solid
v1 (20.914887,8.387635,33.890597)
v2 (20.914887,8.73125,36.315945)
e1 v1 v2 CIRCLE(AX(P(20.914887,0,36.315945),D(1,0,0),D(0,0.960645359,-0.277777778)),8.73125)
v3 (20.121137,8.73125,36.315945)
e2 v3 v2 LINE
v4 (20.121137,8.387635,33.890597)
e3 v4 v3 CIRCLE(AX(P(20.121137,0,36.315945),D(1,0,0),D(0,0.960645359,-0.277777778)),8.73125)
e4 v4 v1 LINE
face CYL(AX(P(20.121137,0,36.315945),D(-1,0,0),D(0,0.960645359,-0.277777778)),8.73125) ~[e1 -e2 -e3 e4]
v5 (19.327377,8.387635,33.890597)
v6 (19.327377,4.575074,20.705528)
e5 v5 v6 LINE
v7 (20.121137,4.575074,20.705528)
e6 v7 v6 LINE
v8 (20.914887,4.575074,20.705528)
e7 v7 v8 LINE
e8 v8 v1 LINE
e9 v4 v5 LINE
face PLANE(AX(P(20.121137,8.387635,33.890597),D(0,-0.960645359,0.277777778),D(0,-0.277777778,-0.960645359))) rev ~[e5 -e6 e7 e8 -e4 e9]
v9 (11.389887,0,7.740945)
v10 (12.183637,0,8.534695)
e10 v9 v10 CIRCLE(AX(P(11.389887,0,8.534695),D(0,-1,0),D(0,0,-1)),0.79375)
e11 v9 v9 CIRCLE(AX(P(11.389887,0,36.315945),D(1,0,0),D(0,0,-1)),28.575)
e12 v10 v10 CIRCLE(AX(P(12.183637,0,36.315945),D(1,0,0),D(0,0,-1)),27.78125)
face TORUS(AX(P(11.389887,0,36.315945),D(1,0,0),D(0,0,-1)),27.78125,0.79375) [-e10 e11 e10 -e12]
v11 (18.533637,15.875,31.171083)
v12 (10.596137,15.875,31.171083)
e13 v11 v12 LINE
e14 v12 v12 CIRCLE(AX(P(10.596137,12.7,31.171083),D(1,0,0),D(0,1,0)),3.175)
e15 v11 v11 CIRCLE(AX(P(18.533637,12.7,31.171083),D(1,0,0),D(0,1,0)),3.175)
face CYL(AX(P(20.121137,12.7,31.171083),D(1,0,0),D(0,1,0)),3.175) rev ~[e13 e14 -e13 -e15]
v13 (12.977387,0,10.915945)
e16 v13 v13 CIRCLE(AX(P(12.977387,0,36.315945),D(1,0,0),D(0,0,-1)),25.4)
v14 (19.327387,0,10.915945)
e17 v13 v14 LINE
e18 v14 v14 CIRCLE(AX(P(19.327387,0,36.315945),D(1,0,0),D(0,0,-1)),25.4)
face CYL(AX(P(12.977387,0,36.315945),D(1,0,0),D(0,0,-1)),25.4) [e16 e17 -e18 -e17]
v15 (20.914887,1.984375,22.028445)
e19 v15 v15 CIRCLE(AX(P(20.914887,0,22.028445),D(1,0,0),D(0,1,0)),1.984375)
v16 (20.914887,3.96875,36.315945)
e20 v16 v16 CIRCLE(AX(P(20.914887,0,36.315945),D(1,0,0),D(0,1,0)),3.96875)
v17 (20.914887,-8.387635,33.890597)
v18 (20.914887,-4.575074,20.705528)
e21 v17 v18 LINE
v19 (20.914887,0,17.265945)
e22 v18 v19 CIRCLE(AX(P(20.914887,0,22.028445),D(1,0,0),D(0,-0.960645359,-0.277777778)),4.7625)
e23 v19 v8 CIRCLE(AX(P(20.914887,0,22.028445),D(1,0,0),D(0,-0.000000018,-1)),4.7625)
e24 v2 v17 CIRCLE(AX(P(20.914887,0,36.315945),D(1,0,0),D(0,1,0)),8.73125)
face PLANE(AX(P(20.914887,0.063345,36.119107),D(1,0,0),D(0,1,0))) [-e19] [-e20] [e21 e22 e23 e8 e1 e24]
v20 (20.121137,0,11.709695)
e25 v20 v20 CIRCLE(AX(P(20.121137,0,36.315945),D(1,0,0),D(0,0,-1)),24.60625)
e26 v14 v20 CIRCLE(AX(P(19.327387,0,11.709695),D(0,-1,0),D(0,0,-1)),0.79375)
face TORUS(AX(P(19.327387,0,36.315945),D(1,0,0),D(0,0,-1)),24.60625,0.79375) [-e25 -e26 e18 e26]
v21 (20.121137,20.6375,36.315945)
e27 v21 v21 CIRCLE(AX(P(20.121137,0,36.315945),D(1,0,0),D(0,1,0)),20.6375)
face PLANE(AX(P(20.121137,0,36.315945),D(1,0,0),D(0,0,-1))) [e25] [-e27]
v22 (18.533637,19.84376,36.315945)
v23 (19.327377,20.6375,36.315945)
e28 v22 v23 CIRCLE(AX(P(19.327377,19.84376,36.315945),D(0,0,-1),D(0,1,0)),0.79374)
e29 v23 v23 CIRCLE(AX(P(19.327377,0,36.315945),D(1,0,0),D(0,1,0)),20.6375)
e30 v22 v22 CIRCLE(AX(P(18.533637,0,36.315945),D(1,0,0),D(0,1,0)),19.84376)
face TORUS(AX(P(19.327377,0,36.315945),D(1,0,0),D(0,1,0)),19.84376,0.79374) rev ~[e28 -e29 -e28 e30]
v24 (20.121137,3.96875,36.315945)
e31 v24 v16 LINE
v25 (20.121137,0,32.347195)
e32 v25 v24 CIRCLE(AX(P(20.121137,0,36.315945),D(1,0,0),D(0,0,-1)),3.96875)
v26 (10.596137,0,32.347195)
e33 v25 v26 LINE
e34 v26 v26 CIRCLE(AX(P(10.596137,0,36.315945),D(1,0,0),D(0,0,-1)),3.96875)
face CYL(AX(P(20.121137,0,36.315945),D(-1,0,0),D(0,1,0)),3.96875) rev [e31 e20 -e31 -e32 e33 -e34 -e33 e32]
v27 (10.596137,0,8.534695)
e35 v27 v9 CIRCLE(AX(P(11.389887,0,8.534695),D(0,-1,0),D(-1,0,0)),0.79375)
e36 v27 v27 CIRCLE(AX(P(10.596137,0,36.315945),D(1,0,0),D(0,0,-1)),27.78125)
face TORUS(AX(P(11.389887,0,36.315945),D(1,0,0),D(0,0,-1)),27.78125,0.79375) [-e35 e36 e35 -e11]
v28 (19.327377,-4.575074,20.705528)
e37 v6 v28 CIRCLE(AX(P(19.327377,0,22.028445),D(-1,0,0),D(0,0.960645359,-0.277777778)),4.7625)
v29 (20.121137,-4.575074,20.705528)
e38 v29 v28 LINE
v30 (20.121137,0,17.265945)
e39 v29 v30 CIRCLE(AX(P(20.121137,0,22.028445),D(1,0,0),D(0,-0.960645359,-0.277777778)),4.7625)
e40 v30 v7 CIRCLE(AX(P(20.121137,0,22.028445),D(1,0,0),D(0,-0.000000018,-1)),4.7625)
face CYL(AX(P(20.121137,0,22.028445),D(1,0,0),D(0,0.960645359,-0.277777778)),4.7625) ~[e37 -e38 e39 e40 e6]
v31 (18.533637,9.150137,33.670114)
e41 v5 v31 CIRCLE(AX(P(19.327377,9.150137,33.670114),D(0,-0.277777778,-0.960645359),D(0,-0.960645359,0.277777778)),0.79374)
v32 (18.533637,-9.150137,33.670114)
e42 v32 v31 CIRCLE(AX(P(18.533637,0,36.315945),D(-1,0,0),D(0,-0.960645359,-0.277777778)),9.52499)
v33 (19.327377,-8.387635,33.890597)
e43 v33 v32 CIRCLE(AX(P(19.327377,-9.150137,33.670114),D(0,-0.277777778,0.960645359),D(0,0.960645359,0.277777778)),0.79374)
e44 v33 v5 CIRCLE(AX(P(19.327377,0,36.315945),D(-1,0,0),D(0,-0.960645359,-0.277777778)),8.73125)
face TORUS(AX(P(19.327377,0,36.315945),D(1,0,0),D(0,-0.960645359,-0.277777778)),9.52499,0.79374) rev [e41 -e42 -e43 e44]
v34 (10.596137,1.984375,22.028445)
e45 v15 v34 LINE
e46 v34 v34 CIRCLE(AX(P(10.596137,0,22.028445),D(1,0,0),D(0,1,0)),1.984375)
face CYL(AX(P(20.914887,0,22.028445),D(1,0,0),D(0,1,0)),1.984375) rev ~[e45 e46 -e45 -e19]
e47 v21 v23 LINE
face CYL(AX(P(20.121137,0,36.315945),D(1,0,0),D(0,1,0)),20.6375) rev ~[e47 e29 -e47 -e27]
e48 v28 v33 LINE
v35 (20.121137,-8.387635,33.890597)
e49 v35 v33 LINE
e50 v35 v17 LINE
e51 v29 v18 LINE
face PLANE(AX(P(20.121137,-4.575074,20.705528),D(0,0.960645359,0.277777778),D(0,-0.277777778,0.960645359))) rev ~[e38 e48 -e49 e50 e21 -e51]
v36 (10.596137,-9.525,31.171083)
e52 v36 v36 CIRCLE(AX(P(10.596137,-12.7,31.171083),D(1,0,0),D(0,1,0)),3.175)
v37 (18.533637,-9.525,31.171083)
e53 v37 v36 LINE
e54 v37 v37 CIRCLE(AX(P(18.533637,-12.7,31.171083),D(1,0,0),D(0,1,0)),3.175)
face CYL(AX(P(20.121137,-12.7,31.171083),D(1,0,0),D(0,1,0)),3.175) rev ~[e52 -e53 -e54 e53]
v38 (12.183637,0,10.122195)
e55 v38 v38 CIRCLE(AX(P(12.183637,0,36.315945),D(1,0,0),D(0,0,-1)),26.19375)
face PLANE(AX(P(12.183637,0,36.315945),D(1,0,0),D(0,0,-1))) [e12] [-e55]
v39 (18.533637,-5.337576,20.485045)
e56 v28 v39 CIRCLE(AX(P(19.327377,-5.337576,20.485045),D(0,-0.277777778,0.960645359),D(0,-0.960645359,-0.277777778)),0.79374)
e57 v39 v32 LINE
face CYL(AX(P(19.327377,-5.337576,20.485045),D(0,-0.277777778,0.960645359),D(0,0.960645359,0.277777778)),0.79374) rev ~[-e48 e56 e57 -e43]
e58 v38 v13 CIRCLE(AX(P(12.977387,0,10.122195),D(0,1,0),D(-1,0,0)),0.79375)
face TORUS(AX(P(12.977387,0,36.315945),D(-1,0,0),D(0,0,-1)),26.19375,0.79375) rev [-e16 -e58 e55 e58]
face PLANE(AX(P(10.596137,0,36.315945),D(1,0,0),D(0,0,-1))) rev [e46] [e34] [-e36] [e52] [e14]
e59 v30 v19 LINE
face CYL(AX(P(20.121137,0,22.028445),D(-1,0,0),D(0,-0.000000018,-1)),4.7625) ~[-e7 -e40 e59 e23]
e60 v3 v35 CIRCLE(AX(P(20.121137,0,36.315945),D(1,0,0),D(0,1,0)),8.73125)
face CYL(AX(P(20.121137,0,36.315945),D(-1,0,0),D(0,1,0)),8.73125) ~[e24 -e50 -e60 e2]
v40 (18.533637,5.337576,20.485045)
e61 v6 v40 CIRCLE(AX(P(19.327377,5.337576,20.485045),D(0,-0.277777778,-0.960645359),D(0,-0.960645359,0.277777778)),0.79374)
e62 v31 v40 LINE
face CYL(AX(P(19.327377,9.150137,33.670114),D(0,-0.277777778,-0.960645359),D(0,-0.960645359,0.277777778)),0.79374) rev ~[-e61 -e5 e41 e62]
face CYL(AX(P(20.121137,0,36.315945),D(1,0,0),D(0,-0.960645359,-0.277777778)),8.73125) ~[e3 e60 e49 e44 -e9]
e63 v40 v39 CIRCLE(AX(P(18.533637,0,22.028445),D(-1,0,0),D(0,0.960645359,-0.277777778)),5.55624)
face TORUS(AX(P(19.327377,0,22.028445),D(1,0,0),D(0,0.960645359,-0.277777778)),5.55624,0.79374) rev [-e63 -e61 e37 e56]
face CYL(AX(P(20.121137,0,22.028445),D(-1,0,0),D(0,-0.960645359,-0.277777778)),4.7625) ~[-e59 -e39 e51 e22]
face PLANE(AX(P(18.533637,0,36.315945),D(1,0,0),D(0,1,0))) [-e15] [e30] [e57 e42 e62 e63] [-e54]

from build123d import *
from build123d import SkipClean  # not in build123d's __all__

# Parameters (mm, degrees)
F2_R     = 3.96875
F2_R_2   = 1.984375
F3_DEPTH = 0.79375
F4_R     = 1.984375
F5_DEPTH = 25.4
F6_R     = 3.175
F7_DEPTH = 25.4
F8_R     = 20.6375
F8_R_2   = 3.175
F9_DEPTH = 1.5875
F10_R    = 0.79374


# Not quite as in the source:
# - a fillet or chamfer is up to 0.001 mm smaller than in the source, because OpenCascade refuses the exact size


with BuildPart() as f1:
    # F0 (on Front) → F1 (revolve)
    with BuildSketch(Plane.XZ):
        with BuildLine():
            Line((20.1211371932, 32.3471946239), (10.5961371932, 32.3471946239))
            Line((10.5961371932, 32.3471946239), (10.5961371932, 8.5346946239))
            ThreePointArc((10.5961371932, 8.5346946239), (10.8286211857, 7.9734286164), (11.3898871932, 7.7409446239))
            ThreePointArc((11.3898871932, 7.7409446239), (11.9511532008, 7.9734286164), (12.1836371932, 8.5346946239))
            Line((12.1836371932, 8.5346946239), (12.1836371932, 10.1221946239))
            ThreePointArc((12.1836371932, 10.1221946239), (12.4161211857, 10.6834606315), (12.9773871932, 10.9159446239))
            Line((12.9773871932, 10.9159446239), (19.3273871932, 10.9159446239))
            ThreePointArc((19.3273871932, 10.9159446239), (19.8886532008, 11.1484286164), (20.1211371932, 11.7096946239))
            Line((20.1211371932, 11.7096946239), (20.1211371932, 32.3471946239))
        make_face()
    revolve(axis=Axis((22.0401428428, 0, 36.3159446239), (1, 0, 0)))

    # F2 (on face) → F3 (join)
    with BuildSketch(Plane.YZ.offset(20.1211371932)):
        with BuildLine():
            ThreePointArc((8.3876347926, 33.8905974017), (8.6449193994, 35.0911609125), (8.73125, 36.3159446239))
            ThreePointArc((8.73125, 36.3159446239), (-1.2247837114, 44.9608640234), (-8.3876347926, 33.8905974017))
            ThreePointArc((-8.3876347926, 33.8905974017), (0, 27.5846946239), (8.3876347926, 33.8905974017))
        make_face()
        with Locations((0, 36.3159446239)):
            Circle(F2_R, mode=Mode.SUBTRACT)
        with BuildLine():
            ThreePointArc((8.3876347926, 33.8905974017), (0, 27.5846946239), (-8.3876347926, 33.8905974017))
            Line((-8.3876347926, 33.8905974017), (-4.5750735232, 20.7055279573))
            ThreePointArc((-4.5750735232, 20.7055279573), (-0.6680638426, 26.7438552055), (4.7625, 22.0284446239))
            ThreePointArc((4.7625, 22.0284446239), (4.7154105815, 21.3603807814), (4.5750735232, 20.7055279573))
            Line((4.5750735232, 20.7055279573), (8.3876347926, 33.8905974017))
        make_face()
        with BuildLine():
            ThreePointArc((4.7625, 22.0284446239), (-0.6680638426, 26.7438552055), (-4.5750735232, 20.7055279573))
            ThreePointArc((-4.5750735232, 20.7055279573), (-2.8619063591, 18.221753378), (-8.55e-08, 17.2659446239))
            ThreePointArc((-8.55e-08, 17.2659446239), (2.8619062907, 18.2217533266), (4.5750735232, 20.7055279573))
            ThreePointArc((4.5750735232, 20.7055279573), (4.7154105815, 21.3603807814), (4.7625, 22.0284446239))
        make_face()
        with Locations((0, 22.0284446239)):
            Circle(F2_R_2, mode=Mode.SUBTRACT)
        with Locations((0, 22.0284446239)):
            Circle(F2_R_2)
    extrude(amount=F3_DEPTH)

    # F4 (on face) → F5 (cut)
    with BuildSketch(Plane.YZ.offset(20.9148871932)):
        with Locations((0, 22.0284446239)):
            Circle(F4_R)
    extrude(amount=-F5_DEPTH, mode=Mode.SUBTRACT)

    # F6 (on face) → F7 (cut)
    with BuildSketch(Plane.YZ.offset(20.1211371932)):
        with Locations((-12.7, 31.1710834503)):
            Circle(F6_R)
        with Locations((12.7, 31.1710834503)):
            Circle(F6_R)
    extrude(amount=-F7_DEPTH, mode=Mode.SUBTRACT)

    # F8 (on face) → F9 (cut)
    with BuildSketch(Plane.YZ.offset(20.1211371932)):
        with Locations((0, 36.3159446239)):
            Circle(F8_R)
        with Locations((-12.7, 31.1710834503)):
            Circle(F8_R_2, mode=Mode.SUBTRACT)
        with BuildLine():
            Line((-4.5750735232, 20.7055279573), (-8.3876347926, 33.8905974017))
            ThreePointArc((-8.3876347926, 33.8905974017), (0, 45.0471946239), (8.3876347926, 33.8905974017))
            Line((8.3876347926, 33.8905974017), (4.5750735232, 20.7055279573))
            ThreePointArc((4.5750735232, 20.7055279573), (0, 17.2659446239), (-4.5750735232, 20.7055279573))
        make_face(mode=Mode.SUBTRACT)
        with Locations((12.7, 31.1710834503)):
            Circle(F8_R_2, mode=Mode.SUBTRACT)
    with SkipClean():  # cleaning this boolean's faces spoils the solid; the shape is the same uncleaned
        extrude(amount=-F9_DEPTH, mode=Mode.SUBTRACT)

    # F10 (radius 0.79375 in the source; OpenCascade refuses exactly that, so slightly less here)
    f10_edges = [f1.edges().sort_by_distance(p)[0] for p in [
        (18.533637, -20.6375, 36.315945),
        (18.533637, 6.481354, 27.298063),
        (18.533637, 0, 45.047195),
        (18.533637, 0, 17.265945),
        (18.533637, -6.481354, 27.298063),
    ]]
    fillet(f10_edges, radius=F10_R)


solid = f1.part
